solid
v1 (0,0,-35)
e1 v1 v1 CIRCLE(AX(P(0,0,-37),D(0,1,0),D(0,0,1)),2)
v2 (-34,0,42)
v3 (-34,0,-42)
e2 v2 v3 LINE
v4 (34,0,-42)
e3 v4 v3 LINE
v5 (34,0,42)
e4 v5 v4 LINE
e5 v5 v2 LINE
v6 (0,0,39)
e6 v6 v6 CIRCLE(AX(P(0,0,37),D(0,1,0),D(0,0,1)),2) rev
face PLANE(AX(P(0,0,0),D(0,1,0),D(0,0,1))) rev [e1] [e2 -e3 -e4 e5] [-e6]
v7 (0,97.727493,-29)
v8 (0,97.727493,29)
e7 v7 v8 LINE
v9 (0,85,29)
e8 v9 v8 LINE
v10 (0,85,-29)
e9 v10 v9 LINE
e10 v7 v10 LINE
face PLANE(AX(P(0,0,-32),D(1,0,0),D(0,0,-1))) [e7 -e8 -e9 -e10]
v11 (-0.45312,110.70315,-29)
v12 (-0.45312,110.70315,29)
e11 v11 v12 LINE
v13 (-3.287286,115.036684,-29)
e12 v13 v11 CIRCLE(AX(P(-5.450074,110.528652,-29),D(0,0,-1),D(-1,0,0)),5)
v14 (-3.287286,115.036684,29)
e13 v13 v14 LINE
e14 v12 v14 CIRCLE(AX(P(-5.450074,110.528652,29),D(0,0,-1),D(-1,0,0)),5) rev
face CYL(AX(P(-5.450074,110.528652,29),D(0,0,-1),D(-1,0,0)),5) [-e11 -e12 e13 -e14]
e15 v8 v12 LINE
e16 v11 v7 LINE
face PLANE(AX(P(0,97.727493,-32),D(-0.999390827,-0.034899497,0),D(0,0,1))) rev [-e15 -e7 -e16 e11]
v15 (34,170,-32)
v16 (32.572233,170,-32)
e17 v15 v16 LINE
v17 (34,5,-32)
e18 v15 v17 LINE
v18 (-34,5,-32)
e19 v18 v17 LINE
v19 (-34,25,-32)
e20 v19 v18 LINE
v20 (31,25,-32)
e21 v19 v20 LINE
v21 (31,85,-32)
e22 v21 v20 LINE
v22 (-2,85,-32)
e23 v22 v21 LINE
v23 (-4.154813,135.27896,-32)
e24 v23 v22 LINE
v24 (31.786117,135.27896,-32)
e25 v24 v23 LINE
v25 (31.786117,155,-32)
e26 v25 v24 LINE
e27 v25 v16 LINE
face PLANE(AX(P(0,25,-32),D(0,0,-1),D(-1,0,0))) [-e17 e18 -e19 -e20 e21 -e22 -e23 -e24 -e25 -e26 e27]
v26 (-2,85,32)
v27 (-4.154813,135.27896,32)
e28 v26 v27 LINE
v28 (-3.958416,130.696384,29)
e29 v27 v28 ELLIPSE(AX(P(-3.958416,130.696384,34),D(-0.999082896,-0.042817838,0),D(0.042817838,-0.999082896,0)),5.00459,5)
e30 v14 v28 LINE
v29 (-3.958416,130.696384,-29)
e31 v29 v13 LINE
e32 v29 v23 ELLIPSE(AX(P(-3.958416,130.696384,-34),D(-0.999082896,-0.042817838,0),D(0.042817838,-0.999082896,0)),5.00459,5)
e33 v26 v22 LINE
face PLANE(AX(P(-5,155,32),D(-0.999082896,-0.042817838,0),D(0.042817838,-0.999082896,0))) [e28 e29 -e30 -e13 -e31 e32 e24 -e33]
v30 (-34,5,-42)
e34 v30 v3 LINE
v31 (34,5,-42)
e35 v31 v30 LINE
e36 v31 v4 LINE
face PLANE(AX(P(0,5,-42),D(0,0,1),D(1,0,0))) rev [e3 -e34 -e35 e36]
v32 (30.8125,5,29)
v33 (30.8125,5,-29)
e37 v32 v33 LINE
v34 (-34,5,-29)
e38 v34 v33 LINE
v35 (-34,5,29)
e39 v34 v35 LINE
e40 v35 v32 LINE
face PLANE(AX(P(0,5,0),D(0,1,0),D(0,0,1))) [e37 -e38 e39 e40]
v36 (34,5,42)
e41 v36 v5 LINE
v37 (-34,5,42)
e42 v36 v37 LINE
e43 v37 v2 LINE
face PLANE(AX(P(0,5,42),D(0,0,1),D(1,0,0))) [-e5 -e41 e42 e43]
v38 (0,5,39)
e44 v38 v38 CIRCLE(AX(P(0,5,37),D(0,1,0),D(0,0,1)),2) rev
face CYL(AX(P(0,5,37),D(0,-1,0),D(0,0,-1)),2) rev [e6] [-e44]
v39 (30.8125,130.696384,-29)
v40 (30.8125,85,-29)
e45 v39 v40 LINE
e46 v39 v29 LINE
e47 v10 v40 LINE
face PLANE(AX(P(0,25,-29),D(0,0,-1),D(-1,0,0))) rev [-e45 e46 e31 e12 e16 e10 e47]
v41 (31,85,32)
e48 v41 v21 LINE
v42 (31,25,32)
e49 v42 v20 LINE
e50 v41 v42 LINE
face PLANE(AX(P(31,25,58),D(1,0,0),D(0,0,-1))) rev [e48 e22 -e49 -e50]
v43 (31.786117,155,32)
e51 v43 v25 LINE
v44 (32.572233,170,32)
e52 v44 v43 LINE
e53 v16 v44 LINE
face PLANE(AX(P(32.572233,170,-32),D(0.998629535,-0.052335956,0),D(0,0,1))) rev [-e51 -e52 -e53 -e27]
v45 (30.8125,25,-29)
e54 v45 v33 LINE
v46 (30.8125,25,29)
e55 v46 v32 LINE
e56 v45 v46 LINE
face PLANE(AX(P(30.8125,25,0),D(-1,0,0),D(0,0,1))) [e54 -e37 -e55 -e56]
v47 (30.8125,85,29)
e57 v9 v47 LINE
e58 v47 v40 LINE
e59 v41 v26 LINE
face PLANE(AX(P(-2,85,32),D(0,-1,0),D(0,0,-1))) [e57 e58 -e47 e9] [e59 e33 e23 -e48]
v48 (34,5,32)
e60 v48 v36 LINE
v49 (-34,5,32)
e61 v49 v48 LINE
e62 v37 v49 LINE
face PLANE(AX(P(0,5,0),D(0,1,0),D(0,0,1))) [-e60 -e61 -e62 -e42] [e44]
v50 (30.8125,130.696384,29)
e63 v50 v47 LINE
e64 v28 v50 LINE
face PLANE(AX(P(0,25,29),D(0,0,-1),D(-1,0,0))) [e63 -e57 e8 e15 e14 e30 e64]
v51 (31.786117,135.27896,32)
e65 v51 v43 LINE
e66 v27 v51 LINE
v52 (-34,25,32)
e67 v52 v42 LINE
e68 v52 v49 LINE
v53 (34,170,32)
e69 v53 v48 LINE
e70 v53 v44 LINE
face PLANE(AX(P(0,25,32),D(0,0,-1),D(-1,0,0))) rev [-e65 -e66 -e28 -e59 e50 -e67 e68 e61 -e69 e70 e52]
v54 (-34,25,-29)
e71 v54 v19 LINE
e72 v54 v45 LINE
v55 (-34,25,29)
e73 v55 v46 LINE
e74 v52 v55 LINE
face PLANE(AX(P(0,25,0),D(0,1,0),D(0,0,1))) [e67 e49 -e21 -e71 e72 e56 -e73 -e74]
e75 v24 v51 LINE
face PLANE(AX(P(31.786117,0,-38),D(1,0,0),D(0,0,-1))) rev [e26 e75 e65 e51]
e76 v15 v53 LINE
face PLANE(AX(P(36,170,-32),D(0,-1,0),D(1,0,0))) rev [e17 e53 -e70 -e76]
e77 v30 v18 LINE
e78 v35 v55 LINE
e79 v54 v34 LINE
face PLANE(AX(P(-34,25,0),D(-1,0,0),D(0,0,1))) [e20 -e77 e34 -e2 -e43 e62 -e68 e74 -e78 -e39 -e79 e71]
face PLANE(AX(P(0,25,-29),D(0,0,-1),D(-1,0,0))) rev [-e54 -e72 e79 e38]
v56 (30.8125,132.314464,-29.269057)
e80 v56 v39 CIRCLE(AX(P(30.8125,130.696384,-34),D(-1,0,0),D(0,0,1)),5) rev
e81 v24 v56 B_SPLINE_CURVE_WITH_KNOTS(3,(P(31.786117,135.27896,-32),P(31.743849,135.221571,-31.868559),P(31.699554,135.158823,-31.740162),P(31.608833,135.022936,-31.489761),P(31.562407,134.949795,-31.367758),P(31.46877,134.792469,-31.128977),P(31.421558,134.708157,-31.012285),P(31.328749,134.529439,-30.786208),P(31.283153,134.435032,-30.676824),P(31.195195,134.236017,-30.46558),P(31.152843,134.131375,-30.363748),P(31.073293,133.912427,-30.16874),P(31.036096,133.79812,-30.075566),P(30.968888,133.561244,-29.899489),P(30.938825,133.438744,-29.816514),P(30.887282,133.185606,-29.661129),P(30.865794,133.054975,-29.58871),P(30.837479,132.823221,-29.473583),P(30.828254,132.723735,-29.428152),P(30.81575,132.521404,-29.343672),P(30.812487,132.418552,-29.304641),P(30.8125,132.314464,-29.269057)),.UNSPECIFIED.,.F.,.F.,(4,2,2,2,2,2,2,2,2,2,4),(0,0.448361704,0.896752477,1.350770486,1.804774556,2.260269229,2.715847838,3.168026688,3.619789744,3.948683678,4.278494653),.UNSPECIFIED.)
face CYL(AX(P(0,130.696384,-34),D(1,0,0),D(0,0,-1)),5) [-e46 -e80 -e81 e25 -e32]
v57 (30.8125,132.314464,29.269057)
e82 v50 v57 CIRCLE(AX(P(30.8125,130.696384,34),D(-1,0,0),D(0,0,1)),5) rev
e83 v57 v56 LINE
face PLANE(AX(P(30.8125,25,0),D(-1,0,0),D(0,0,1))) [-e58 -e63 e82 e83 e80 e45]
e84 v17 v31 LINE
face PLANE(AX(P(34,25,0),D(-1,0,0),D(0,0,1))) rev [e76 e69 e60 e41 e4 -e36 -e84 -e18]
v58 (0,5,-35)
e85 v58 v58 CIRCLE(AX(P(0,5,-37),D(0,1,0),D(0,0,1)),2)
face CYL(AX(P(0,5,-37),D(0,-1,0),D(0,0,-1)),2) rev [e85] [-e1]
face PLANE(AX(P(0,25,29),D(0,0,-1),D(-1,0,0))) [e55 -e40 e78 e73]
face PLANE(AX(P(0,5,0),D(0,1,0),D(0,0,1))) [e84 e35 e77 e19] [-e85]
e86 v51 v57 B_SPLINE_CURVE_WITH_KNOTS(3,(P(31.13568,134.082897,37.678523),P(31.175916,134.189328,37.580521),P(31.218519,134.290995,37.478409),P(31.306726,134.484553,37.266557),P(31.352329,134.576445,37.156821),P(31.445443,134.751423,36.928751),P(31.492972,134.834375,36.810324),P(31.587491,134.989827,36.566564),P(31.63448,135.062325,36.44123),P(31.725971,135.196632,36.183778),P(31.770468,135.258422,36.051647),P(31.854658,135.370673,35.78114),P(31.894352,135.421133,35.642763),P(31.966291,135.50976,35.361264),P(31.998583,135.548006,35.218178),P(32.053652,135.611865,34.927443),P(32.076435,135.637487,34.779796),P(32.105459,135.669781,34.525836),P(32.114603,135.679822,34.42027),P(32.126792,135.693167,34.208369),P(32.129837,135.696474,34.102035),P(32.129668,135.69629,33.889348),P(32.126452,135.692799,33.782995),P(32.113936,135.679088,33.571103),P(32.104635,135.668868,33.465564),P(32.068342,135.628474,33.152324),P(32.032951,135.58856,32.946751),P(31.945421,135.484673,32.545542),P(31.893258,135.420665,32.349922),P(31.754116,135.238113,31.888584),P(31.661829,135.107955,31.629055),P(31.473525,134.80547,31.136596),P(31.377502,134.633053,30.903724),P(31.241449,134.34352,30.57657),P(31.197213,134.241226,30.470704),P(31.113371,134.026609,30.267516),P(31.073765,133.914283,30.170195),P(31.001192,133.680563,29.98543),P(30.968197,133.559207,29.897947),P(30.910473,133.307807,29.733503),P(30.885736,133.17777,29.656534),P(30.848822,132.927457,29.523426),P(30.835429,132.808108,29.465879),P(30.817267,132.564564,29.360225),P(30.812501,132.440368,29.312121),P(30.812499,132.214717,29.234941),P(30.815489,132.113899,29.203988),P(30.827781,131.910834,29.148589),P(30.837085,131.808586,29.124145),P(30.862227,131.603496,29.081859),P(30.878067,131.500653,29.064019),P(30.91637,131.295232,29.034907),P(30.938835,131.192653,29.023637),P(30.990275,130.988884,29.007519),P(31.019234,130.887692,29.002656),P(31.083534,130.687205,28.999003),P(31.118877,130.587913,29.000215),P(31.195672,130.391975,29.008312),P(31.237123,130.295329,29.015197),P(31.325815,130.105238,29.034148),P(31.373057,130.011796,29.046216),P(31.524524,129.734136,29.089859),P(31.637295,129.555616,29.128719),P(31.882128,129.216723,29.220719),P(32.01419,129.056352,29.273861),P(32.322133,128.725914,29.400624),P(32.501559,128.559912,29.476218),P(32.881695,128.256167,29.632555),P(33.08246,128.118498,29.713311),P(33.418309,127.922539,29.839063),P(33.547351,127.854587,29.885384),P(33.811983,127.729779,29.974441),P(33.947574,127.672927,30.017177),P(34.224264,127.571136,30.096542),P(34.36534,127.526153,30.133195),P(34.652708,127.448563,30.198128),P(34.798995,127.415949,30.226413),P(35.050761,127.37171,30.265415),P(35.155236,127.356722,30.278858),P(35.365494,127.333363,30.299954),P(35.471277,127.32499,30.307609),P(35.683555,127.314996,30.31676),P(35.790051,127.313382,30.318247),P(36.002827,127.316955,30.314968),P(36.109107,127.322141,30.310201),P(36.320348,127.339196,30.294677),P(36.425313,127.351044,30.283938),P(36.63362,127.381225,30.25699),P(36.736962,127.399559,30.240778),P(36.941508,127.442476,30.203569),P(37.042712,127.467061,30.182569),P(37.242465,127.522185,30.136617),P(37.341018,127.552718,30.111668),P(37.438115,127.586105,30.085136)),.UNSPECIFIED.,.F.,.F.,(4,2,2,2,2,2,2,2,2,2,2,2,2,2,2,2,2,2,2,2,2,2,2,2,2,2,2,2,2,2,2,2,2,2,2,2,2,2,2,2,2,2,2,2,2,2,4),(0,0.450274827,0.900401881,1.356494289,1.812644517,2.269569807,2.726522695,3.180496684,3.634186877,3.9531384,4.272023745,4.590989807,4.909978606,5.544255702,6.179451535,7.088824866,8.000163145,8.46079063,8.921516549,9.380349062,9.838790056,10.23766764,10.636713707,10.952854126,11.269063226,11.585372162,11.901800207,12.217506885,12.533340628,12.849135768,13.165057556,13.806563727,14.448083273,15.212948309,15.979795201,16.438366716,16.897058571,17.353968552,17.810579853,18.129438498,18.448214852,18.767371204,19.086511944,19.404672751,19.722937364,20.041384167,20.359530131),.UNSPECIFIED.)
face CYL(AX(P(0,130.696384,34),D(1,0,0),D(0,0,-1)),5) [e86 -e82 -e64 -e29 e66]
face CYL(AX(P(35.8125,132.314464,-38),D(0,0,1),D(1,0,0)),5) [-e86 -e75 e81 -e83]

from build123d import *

# Parameters (mm, degrees)
CROQUIS1_W              = 68
CROQUIS1_H              = 64
CROQUIS1_W_2            = 61.625
CROQUIS1_H_2            = 58
SALIENTE_EXTRUIR1_DEPTH = 25
SALIENTE_EXTRUIR2_DEPTH = 160
SALIENTE_EXTRUIR3_DEPTH = 61
SALIENTE_EXTRUIR5_DEPTH = 3
CROQUIS4_W              = 100
CROQUIS4_H              = 30
CORTAR_EXTRUIR1_DEPTH   = 83
CHAFL_N1_SIZE           = 2
CHAFL_N1_SIZE2          = 57.272506566
CROQUIS1_2_W            = 68
CROQUIS1_2_H            = 64
CROQUIS1_2_W_2          = 61.625
CROQUIS1_2_H_2          = 58
SALIENTE_EXTRUIR6_DEPTH = 5
CROQUIS5_W              = 40
CROQUIS5_H              = 60
CORTAR_EXTRUIR2_DEPTH   = 90
CROQUIS1_4_W            = 68
CROQUIS1_4_H            = 10
CROQUIS1_4_R            = 2
SALIENTE_EXTRUIR7_DEPTH = 5
CROQUIS6_W              = 75.447981844
CROQUIS6_H              = 15
CORTAR_EXTRUIR3_DEPTH   = 5
CHAFL_N2_SIZE           = 30
CHAFL_N2_SIZE_2         = 1.572233378
CHAFL_N3_SIZE           = 5
CHAFL_N3_SIZE2          = 0.881634904
CROQUIS7_W              = 58
CROQUIS7_H              = 20
CORTAR_EXTRUIR4_DEPTH   = 40
CROQUIS8_W              = 58
CROQUIS8_H              = 40
CORTAR_EXTRUIR5_DEPTH   = 10
REDONDEO2_R             = 5
CORTAR_EXTRUIR6_DEPTH   = 70
REDONDEO5_R             = 5


with BuildPart() as part:
    # Croquis1 → Saliente-Extruir1 (new body)
    with BuildSketch(Plane(origin=(0, 0, 0), x_dir=(1, 0, 0), z_dir=(0, 1, 0))):
        Rectangle(CROQUIS1_W, CROQUIS1_H)
        Rectangle(CROQUIS1_W_2, CROQUIS1_H_2, mode=Mode.SUBTRACT)
    extrude(amount=SALIENTE_EXTRUIR1_DEPTH)

    # Croquis2 → Saliente-Extruir2 (add)
    with BuildSketch(Plane(origin=(0, 25, 0), x_dir=(1, 0, 0), z_dir=(0, 1, 0))):
        Polygon((0, 29), (0, 32), (34, 32), (34, -32), (0, -32), (0, -29), (30.8125, -29), (30.8125, 29), align=None)
    extrude(amount=SALIENTE_EXTRUIR2_DEPTH)



with BuildPart() as body_2:
    # Croquis3 → Saliente-Extruir3 (new body)
    with BuildSketch(Plane(origin=(0, 0, 29), x_dir=(-1, 0, 0), z_dir=(0, 0, -1))):
        Polygon((0, 155), (5, 155), (2, 85), (0, 85), align=None)
    extrude(amount=SALIENTE_EXTRUIR3_DEPTH)


with BuildPart() as part_1:
    add(part.part)

    add(body_2.part)  # Saliente-Extruir5 merges body 2
    # Croquis3<4> → Saliente-Extruir5 (add)
    with BuildSketch(Plane(origin=(0, 0, 29), x_dir=(-1, 0, 0), z_dir=(0, 0, -1))):
        Polygon((0, 155), (5, 155), (2, 85), (0, 85), align=None)
    extrude(amount=-SALIENTE_EXTRUIR5_DEPTH)

    # Croquis4 → Cortar-Extruir1 (cut)
    with BuildSketch(Plane(origin=(0, 0, -32), x_dir=(-1, 0, 0), z_dir=(0, 0, -1))):
        with Locations((19, 170)):
            Rectangle(CROQUIS4_W, CROQUIS4_H)
    extrude(amount=-CORTAR_EXTRUIR1_DEPTH, mode=Mode.SUBTRACT)

    # Chaflán1
    chafl_n1_edges = [part_1.edges().sort_by_distance(p)[0] for p in [
        (0, 155, 0),
    ]]
    chafl_n1_side = [part_1.faces().sort_by_distance(p)[0] for p in [
        (13, 155, -31.26569761),
    ]]
    chamfer(chafl_n1_edges, length=CHAFL_N1_SIZE, length2=CHAFL_N1_SIZE2, reference=chafl_n1_side[0])

    # Croquis1<2> → Saliente-Extruir6 (add)
    # profile 1 of 2: a face of its own
    with BuildSketch(Plane(origin=(0, 0, 0), x_dir=(1, 0, 0), z_dir=(0, 1, 0))):
        Rectangle(CROQUIS1_2_W, CROQUIS1_2_H)
        Rectangle(CROQUIS1_2_W_2, CROQUIS1_2_H_2, mode=Mode.SUBTRACT)
    # profile 2 of 2: a face of its own
    with BuildSketch(Plane(origin=(0, 0, 0), x_dir=(1, 0, 0), z_dir=(0, 1, 0))):
        Rectangle(CROQUIS1_2_W_2, CROQUIS1_2_H_2)
    extrude(amount=SALIENTE_EXTRUIR6_DEPTH)

    # Croquis5 → Cortar-Extruir2 (cut)
    with BuildSketch(Plane(origin=(0, 0, -32), x_dir=(-1, 0, 0), z_dir=(0, 0, -1))):
        with Locations((-11, 55)):
            Rectangle(CROQUIS5_W, CROQUIS5_H)
    extrude(amount=-CORTAR_EXTRUIR2_DEPTH, mode=Mode.SUBTRACT)

    # Croquis1<4> → Saliente-Extruir7 (add)
    # profile 1 of 2: a face of its own
    with BuildSketch(Plane(origin=(0, 0, 0), x_dir=(1, 0, 0), z_dir=(0, 1, 0))):
        with Locations((0, 37)):
            Rectangle(CROQUIS1_4_W, CROQUIS1_4_H)
        with Locations(Location((0, 37, 0), (0, 0, 270))):
            Circle(CROQUIS1_4_R, mode=Mode.SUBTRACT)
    # profile 2 of 2: a face of its own
    with BuildSketch(Plane(origin=(0, 0, 0), x_dir=(1, 0, 0), z_dir=(0, 1, 0))):
        with Locations((0, -37)):
            Rectangle(CROQUIS1_4_W, CROQUIS1_4_H)
        with Locations(Location((0, -37, 0), (0, 0, 270))):
            Circle(CROQUIS1_4_R, mode=Mode.SUBTRACT)
    extrude(amount=SALIENTE_EXTRUIR7_DEPTH)

    # Croquis6 → Cortar-Extruir3 (cut)
    with BuildSketch(Plane.ZY.offset(-31)):
        with Locations((5.723990922, 177.5)):
            Rectangle(CROQUIS6_W, CROQUIS6_H)
    extrude(amount=-CORTAR_EXTRUIR3_DEPTH, mode=Mode.SUBTRACT)

    # Chaflán2
    # the kernel refuses this chamfer: 30, 1.572233378 mm, written as the material it takes off along each edge
    with BuildSketch(Plane(origin=(31, 170, -109.996046635), x_dir=(-0.002013023422382327, -0.9999979738662979, 0), z_dir=(0, 0, 1))) as chafl_n2_piece_1_section:
        Polygon((CHAFL_N2_SIZE * 0.999997973866, CHAFL_N2_SIZE * 0.00201302342238), (-CHAFL_N2_SIZE_2 * 0.00201302342301, CHAFL_N2_SIZE_2 * 0.999997974179), (0, 0), align=None)
    chafl_n2_piece_1 = extrude(amount=219.992093269, mode=Mode.PRIVATE)
    chafl_n2_piece_1 = split(chafl_n2_piece_1, bisect_by=Plane(origin=(31.611424092, 155, 0), z_dir=(0, 1, 0)), keep=Keep.TOP, mode=Mode.PRIVATE)
    add(chafl_n2_piece_1, mode=Mode.SUBTRACT)

    # Chaflán3
    chafl_n3_edges = [part_1.edges().sort_by_distance(p)[0] for p in [
        (30.8125, 155, 0),
    ]]
    chafl_n3_side = [part_1.faces().sort_by_distance(p)[0] for p in [
        (30.8125, 120, 0),
    ]]
    chamfer(chafl_n3_edges, length=CHAFL_N3_SIZE, length2=CHAFL_N3_SIZE2, reference=chafl_n3_side[0])

    # Croquis7 → Cortar-Extruir4 (cut)
    with BuildSketch(Plane.ZY.offset(34)):
        with Locations((0, 15)):
            Rectangle(CROQUIS7_W, CROQUIS7_H)
    extrude(amount=-CORTAR_EXTRUIR4_DEPTH, mode=Mode.SUBTRACT)

    # Croquis8 → Cortar-Extruir5 (cut)
    with BuildSketch(Plane(origin=(1.639845182, 0.070279079, 0), x_dir=(0, 0, 1), z_dir=(-0.9990828958176697, -0.04281783839218585, 0))):
        with Locations((0, 135.071938044)):
            Rectangle(CROQUIS8_W, CROQUIS8_H)
    extrude(amount=-CORTAR_EXTRUIR5_DEPTH, mode=Mode.SUBTRACT)

    # Redondeo2
    # the kernel refuses this fillet: 5 mm, written as the material it takes off along each edge
    with BuildSketch(Plane(origin=(-0.608459404, 115.151491041, 29), x_dir=(0.034899496702498145, -0.9993908270190959, 0), z_dir=(0, 0, -1))) as redondeo2_piece_1:
        with BuildLine():
            CenterArc((4.451052559, 5), REDONDEO2_R, 207.629976372, 62.370023628)
            Line((0.021247221, 2.681201893), (0, 0))
            Line((0, 0), (4.451052559, 0))
        make_face()
    extrude(amount=58, mode=Mode.SUBTRACT)

    # Croquis9 → Cortar-Extruir6 (cut)
    with BuildSketch(Plane.XY.offset(32)):
        Polygon((-5, 155), (-4.15481256, 135.278959735), (31.786116689, 135.278959735), (31.786116689, 137.80344281), (31.786116689, 155), (-4.263004692, 155), align=None)
    extrude(amount=-CORTAR_EXTRUIR6_DEPTH, mode=Mode.SUBTRACT)

    # Redondeo5
    # the kernel refuses this fillet: 5 mm, written as the material it takes off along each edge
    with BuildSketch(Plane(origin=(30.8125, 135.278959735, 29), x_dir=(0, 0, 1), z_dir=(-1, 0, 0))) as redondeo5_piece_1_section:
        with BuildLine():
            CenterArc((5, -4.582575695), REDONDEO5_R, 113.578178478, 66.421821522)
            Line((0, -4.582575695), (-0.1, -4.582575695))
            Line((-0.1, -4.582575695), (-0.1, 0))
            Line((-0.1, 0), (0, 0.1))
            ThreePointArc((0, 0.1), (1.5, 0.1), (2.96, 0.091651514))
            Line((2.96, 0.091651514), (3, 0))
        make_face()
    redondeo5_piece_1 = extrude(amount=46.423751797, mode=Mode.PRIVATE)
    redondeo5_piece_1 = split(redondeo5_piece_1, bisect_by=Plane(origin=(-4.075030571, 133.417379989, 29.7763393), z_dir=(0.9990828958176697, 0.042817838392185836, 0)), keep=Keep.TOP, mode=Mode.PRIVATE)
    add(redondeo5_piece_1, mode=Mode.SUBTRACT)
    with BuildSketch(Plane(origin=(-15.611251797, 135.278959735, -29), x_dir=(0, -1, 0), z_dir=(1, 0, 0))) as redondeo5_piece_2_section:
        with BuildLine():
            CenterArc((4.582575695, 5), REDONDEO5_R, 203.578178478, 66.421821522)
            Line((0, 3), (-0.091651514, 2.96))
            ThreePointArc((-0.091651514, 2.96), (-0.1, 1.5), (-0.1, 0))
            Line((-0.1, 0), (0, -0.1))
            Line((0, -0.1), (4.582575695, -0.1))
            Line((4.582575695, -0.1), (4.582575695, 0))
        make_face()
    redondeo5_piece_2 = extrude(amount=46.423751797, mode=Mode.PRIVATE)
    redondeo5_piece_2 = split(redondeo5_piece_2, bisect_by=Plane(origin=(-4.075030571, 133.417379989, -29.7763393), z_dir=(0.9990828958176697, 0.042817838392185836, 0)), keep=Keep.TOP, mode=Mode.PRIVATE)
    add(redondeo5_piece_2, mode=Mode.SUBTRACT)
    with BuildSketch(Plane(origin=(30.8125, 135.278959735, -29), x_dir=(1, 0, 0), z_dir=(0, 0, 1))) as redondeo5_piece_3:
        with BuildLine():
            CenterArc((5, -2.964496152), REDONDEO5_R, 143.636982553, 36.363017447)
            Line((0, -2.964496152), (-0.1, -2.964496152))
            Line((-0.1, -2.964496152), (-0.1, 0))
            Line((-0.1, 0), (0, 0.1))
            ThreePointArc((0, 0.1), (0.486808345, 0.1), (0.893089023, 0.059289923))
            Line((0.893089023, 0.059289923), (0.973616689, 0))
        make_face()
    extrude(amount=58, mode=Mode.SUBTRACT)
    with BuildSketch(Plane(origin=(30.8125, 135.278959735, -29), x_dir=(1, 0, 0), z_dir=(0, 0, 1))) as redondeo5_piece_4a_section:
        with BuildLine():
            CenterArc((5, -2.964496152), REDONDEO5_R, 143.636982553, 36.363017447)
            Line((0, -2.964496152), (-0.1, -2.964496152))
            Line((-0.1, -2.964496152), (-0.1, 0))
            Line((-0.1, 0), (0, 0.1))
            ThreePointArc((0, 0.1), (0.486808345, 0.1), (0.893089023, 0.059289923))
            Line((0.893089023, 0.059289923), (0.973616689, 0))
        make_face()
    redondeo5_piece_4a = extrude(amount=65.41124038, mode=Mode.PRIVATE)
    redondeo5_piece_4a = split(redondeo5_piece_4a, bisect_by=Plane(origin=(31.030991271, 134.436005592, 29), z_dir=(0, 0, 1)), keep=Keep.TOP, mode=Mode.PRIVATE)
    with BuildSketch(Plane(origin=(42.268939237, 135.278959735, 29), x_dir=(0, 0, 1), z_dir=(-1, 0, 0))) as redondeo5_piece_4b_section:
        with BuildLine():
            CenterArc((5, -4.582575695), REDONDEO5_R, 113.578178478, 66.421821522)
            Line((0, -4.582575695), (-0.1, -4.582575695))
            Line((-0.1, -4.582575695), (-0.1, 0))
            Line((-0.1, 0), (0, 0.1))
            ThreePointArc((0, 0.1), (1.5, 0.1), (2.96, 0.091651514))
            Line((2.96, 0.091651514), (3, 0))
        make_face()
    redondeo5_piece_4b = extrude(amount=57.880191035, mode=Mode.PRIVATE)
    redondeo5_piece_4b = split(redondeo5_piece_4b, bisect_by=Plane(origin=(30.8125, 134.163022014, 29.775816439), z_dir=(1, 0, 0)), keep=Keep.TOP, mode=Mode.PRIVATE)
    redondeo5_piece_4 = redondeo5_piece_4a & redondeo5_piece_4b
    add(redondeo5_piece_4, mode=Mode.SUBTRACT)
    with BuildSketch(Plane(origin=(-15.611251797, 135.278959735, -29), x_dir=(0, -1, 0), z_dir=(1, 0, 0))) as redondeo5_piece_5a_section:
        with BuildLine():
            CenterArc((4.582575695, 5), REDONDEO5_R, 203.578178478, 66.421821522)
            Line((0, 3), (-0.091651514, 2.96))
            ThreePointArc((-0.091651514, 2.96), (-0.1, 1.5), (-0.1, 0))
            Line((-0.1, 0), (0, -0.1))
            Line((0, -0.1), (4.582575695, -0.1))
            Line((4.582575695, -0.1), (4.582575695, 0))
        make_face()
    redondeo5_piece_5a = extrude(amount=57.880191035, mode=Mode.PRIVATE)
    redondeo5_piece_5a = split(redondeo5_piece_5a, bisect_by=Plane(origin=(30.8125, 134.163022014, -29.775816439), z_dir=(1, 0, 0)), keep=Keep.TOP, mode=Mode.PRIVATE)
    with BuildSketch(Plane(origin=(30.8125, 135.278959735, -36.41124038), x_dir=(1, 0, 0), z_dir=(0, 0, 1))) as redondeo5_piece_5b_section:
        with BuildLine():
            CenterArc((5, -2.964496152), REDONDEO5_R, 143.636982553, 36.363017447)
            Line((0, -2.964496152), (-0.1, -2.964496152))
            Line((-0.1, -2.964496152), (-0.1, 0))
            Line((-0.1, 0), (0, 0.1))
            ThreePointArc((0, 0.1), (0.486808345, 0.1), (0.893089023, 0.059289923))
            Line((0.893089023, 0.059289923), (0.973616689, 0))
        make_face()
    redondeo5_piece_5b = extrude(amount=65.41124038, mode=Mode.PRIVATE)
    redondeo5_piece_5b = split(redondeo5_piece_5b, bisect_by=Plane(origin=(31.030991271, 134.436005592, -29), z_dir=(0, 0, -1)), keep=Keep.TOP, mode=Mode.PRIVATE)
    redondeo5_piece_5 = redondeo5_piece_5a & redondeo5_piece_5b
    add(redondeo5_piece_5, mode=Mode.SUBTRACT)


solid = part_1.part
